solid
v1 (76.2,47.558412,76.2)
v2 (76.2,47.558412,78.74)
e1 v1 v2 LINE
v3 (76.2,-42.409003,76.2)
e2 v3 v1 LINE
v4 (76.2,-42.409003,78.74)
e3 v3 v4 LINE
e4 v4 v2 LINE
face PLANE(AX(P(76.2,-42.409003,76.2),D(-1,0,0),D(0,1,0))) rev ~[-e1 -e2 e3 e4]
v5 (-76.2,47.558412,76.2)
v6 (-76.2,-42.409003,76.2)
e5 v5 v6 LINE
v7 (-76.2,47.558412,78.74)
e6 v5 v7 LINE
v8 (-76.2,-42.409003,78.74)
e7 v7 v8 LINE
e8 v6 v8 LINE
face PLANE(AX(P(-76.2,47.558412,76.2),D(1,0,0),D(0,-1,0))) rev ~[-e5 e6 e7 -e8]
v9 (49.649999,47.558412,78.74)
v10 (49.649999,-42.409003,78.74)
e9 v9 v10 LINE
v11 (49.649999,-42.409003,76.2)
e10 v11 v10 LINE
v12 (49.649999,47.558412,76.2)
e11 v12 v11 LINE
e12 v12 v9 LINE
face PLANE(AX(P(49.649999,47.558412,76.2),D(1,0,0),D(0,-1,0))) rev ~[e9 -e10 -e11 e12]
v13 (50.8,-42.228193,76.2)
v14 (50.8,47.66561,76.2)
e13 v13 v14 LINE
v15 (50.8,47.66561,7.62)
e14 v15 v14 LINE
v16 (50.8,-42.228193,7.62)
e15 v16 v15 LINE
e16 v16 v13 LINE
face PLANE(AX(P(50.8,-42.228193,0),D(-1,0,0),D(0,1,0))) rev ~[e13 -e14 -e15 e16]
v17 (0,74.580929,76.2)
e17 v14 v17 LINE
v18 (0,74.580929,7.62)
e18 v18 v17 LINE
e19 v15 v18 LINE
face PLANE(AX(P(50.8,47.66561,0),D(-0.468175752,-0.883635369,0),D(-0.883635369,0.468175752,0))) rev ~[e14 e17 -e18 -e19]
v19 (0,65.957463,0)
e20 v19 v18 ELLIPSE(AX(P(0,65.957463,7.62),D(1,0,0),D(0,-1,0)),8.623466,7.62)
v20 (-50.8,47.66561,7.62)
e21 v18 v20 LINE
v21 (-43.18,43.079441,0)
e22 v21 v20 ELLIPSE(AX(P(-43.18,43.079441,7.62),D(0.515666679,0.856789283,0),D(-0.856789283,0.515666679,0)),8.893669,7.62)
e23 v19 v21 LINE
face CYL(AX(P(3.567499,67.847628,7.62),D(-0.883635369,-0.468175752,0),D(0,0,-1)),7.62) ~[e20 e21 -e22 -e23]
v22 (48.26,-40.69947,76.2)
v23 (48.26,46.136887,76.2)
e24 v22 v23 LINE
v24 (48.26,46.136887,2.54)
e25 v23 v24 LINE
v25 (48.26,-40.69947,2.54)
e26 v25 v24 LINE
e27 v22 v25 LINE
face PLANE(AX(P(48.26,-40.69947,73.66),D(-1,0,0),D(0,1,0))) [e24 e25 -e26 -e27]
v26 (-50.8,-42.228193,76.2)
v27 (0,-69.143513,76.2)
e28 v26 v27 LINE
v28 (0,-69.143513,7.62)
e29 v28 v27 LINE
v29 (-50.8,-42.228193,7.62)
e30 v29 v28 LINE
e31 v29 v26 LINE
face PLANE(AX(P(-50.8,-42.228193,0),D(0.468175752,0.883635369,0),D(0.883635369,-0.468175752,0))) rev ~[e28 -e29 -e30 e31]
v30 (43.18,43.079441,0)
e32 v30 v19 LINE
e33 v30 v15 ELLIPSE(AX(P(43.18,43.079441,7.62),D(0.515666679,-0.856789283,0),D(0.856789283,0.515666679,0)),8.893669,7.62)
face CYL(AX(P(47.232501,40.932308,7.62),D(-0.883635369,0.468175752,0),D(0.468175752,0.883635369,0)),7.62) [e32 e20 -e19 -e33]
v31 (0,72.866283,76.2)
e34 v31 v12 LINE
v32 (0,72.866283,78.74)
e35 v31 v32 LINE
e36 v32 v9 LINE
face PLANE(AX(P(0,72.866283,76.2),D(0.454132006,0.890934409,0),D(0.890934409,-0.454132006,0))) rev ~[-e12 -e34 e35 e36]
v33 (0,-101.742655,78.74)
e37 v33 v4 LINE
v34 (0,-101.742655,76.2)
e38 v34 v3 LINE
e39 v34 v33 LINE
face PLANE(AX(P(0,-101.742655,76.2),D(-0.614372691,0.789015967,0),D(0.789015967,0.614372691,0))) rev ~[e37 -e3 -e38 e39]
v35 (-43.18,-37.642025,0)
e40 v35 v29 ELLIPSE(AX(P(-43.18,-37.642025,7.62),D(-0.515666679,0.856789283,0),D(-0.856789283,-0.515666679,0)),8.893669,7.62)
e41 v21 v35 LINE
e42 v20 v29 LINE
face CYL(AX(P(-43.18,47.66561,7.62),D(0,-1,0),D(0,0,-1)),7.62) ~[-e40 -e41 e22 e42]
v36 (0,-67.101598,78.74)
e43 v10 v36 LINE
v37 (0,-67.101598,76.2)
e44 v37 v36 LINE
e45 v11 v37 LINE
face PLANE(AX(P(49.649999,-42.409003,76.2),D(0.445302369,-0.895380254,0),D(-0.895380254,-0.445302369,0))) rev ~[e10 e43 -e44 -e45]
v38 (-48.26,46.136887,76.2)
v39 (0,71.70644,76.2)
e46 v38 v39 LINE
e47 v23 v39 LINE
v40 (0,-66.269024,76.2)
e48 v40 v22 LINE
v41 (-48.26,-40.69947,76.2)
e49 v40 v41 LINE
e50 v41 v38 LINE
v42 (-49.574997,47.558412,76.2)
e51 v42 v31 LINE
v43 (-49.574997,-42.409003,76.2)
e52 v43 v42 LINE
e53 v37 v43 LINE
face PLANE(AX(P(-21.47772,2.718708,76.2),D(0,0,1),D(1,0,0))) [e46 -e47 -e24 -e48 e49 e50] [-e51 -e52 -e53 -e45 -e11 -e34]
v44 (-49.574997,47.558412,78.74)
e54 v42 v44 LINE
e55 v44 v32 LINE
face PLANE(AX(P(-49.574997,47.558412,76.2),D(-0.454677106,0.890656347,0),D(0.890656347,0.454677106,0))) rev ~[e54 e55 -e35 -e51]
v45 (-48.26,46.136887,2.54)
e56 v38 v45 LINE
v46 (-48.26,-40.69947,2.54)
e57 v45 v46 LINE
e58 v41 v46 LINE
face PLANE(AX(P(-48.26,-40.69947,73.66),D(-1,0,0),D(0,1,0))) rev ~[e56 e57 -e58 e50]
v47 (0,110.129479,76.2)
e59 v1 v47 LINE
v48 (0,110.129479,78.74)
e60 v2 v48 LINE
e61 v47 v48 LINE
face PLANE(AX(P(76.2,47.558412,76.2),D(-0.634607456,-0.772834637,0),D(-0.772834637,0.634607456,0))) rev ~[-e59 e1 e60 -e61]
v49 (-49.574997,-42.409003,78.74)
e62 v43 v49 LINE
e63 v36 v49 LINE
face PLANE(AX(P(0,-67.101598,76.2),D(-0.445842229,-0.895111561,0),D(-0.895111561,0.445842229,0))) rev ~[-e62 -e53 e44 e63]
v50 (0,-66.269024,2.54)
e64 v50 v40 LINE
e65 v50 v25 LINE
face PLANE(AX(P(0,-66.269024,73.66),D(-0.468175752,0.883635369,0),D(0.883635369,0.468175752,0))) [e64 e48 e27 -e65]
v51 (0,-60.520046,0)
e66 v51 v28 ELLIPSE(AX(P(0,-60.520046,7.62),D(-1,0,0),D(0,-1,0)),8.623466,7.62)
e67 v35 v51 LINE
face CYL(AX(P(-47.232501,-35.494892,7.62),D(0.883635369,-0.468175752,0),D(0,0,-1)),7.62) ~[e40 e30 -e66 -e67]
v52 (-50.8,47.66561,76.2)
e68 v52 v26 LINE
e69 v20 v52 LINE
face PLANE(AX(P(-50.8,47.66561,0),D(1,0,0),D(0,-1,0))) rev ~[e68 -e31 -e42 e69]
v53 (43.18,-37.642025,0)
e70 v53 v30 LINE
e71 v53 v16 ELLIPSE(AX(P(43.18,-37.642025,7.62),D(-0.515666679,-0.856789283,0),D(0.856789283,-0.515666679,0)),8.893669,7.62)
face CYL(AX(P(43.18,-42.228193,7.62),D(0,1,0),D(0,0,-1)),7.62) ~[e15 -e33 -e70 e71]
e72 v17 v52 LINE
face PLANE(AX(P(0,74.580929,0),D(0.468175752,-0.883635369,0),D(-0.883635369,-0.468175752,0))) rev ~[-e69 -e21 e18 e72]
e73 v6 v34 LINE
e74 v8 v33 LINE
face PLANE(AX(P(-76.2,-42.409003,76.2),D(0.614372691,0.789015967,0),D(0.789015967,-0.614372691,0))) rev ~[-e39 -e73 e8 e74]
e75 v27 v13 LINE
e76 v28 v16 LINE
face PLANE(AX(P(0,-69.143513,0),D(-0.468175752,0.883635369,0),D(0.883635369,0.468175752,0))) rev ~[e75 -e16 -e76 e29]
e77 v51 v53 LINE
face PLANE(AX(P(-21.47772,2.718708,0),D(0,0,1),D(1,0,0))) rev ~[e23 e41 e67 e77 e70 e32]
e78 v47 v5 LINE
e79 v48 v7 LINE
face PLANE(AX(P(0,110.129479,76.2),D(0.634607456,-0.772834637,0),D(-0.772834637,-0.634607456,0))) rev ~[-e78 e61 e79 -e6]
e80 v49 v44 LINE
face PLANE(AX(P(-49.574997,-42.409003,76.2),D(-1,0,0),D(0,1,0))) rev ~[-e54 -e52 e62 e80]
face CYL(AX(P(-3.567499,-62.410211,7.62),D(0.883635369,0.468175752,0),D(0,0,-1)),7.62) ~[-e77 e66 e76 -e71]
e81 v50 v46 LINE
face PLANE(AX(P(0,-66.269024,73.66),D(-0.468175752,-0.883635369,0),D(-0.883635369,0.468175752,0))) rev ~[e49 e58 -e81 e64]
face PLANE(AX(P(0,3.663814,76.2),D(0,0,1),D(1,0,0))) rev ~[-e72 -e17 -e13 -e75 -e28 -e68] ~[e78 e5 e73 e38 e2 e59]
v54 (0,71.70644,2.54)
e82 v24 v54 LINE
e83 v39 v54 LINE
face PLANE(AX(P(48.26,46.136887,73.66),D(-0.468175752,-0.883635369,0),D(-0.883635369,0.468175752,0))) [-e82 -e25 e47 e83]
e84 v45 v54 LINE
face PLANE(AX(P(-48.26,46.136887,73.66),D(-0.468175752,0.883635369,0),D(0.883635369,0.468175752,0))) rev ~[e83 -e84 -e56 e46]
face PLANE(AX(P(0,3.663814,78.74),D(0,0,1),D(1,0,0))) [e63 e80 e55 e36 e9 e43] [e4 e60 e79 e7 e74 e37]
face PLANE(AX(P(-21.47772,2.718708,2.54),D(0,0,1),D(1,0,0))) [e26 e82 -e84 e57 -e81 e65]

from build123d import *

# Parameters (mm, degrees)
F1_DEPTH = 76.2
F4_DEPTH = 2.54
F5_T     = -2.54
F6_R     = 7.62


# Not quite as in the source:
# - a shell that OpenCascade refuses in one call is made with other operations: the cavity is built on its own and cut out


with BuildPart() as f1:
    # F0 (on Top) → F1 (new body)
    with BuildSketch(Plane.XY):
        Polygon((0, -69.1435125567), (0, 74.5809290344), (-50.8, 47.6656096473), (-50.8, -42.2281931696), align=None)
        Polygon((50.8, 47.6656096473), (0, 74.5809290344), (0, -69.1435125567), (50.8, -42.2281931696), align=None)
    extrude(amount=F1_DEPTH)

    # F3 (on offset) → F4 (join)
    with BuildSketch(Plane.XY.offset(76.2)):
        Polygon((76.2, 47.5584119558), (0, 110.1294793168), (-76.2, 47.5584119558), (-76.2, -42.4090027809), (0, -101.7426550388), (76.2, -42.4090027809), align=None)
        Polygon((-49.5749972761, 47.5584119558), (0, 72.8662833571), (49.6499985456, 47.5584119558), (49.6499985456, -42.4090027809), (0, -67.1015977859), (-49.5749972761, -42.4090027809), align=None, mode=Mode.SUBTRACT)
    extrude(amount=F4_DEPTH)

    # F5: a shell. OpenCascade refuses it in one call, so the cavity is built on its own and cut out:
    # the body offset inwards by the wall thickness, plus a prism from it out through each open face.
    f5_core = offset(f1.part, amount=F5_T, mode=Mode.PRIVATE)
    f5_exits = [f5_core.faces().sort_by_distance(p)[0] for p in [
        (0, 2.718708, 73.66),
    ]]
    add(f5_core, mode=Mode.SUBTRACT)
    extrude(f5_exits, amount=-F5_T, mode=Mode.SUBTRACT)

    # F6
    f6_edges = [f1.edges().sort_by_distance(p)[0] for p in [
        (-25.4, 61.123269, 0),
        (-50.8, 2.718708, 0),
        (-25.4, -55.685853, 0),
        (25.4, -55.685853, 0),
        (50.8, 2.718708, 0),
        (25.4, 61.123269, 0),
    ]]
    fillet(f6_edges, radius=F6_R)


solid = f1.part
